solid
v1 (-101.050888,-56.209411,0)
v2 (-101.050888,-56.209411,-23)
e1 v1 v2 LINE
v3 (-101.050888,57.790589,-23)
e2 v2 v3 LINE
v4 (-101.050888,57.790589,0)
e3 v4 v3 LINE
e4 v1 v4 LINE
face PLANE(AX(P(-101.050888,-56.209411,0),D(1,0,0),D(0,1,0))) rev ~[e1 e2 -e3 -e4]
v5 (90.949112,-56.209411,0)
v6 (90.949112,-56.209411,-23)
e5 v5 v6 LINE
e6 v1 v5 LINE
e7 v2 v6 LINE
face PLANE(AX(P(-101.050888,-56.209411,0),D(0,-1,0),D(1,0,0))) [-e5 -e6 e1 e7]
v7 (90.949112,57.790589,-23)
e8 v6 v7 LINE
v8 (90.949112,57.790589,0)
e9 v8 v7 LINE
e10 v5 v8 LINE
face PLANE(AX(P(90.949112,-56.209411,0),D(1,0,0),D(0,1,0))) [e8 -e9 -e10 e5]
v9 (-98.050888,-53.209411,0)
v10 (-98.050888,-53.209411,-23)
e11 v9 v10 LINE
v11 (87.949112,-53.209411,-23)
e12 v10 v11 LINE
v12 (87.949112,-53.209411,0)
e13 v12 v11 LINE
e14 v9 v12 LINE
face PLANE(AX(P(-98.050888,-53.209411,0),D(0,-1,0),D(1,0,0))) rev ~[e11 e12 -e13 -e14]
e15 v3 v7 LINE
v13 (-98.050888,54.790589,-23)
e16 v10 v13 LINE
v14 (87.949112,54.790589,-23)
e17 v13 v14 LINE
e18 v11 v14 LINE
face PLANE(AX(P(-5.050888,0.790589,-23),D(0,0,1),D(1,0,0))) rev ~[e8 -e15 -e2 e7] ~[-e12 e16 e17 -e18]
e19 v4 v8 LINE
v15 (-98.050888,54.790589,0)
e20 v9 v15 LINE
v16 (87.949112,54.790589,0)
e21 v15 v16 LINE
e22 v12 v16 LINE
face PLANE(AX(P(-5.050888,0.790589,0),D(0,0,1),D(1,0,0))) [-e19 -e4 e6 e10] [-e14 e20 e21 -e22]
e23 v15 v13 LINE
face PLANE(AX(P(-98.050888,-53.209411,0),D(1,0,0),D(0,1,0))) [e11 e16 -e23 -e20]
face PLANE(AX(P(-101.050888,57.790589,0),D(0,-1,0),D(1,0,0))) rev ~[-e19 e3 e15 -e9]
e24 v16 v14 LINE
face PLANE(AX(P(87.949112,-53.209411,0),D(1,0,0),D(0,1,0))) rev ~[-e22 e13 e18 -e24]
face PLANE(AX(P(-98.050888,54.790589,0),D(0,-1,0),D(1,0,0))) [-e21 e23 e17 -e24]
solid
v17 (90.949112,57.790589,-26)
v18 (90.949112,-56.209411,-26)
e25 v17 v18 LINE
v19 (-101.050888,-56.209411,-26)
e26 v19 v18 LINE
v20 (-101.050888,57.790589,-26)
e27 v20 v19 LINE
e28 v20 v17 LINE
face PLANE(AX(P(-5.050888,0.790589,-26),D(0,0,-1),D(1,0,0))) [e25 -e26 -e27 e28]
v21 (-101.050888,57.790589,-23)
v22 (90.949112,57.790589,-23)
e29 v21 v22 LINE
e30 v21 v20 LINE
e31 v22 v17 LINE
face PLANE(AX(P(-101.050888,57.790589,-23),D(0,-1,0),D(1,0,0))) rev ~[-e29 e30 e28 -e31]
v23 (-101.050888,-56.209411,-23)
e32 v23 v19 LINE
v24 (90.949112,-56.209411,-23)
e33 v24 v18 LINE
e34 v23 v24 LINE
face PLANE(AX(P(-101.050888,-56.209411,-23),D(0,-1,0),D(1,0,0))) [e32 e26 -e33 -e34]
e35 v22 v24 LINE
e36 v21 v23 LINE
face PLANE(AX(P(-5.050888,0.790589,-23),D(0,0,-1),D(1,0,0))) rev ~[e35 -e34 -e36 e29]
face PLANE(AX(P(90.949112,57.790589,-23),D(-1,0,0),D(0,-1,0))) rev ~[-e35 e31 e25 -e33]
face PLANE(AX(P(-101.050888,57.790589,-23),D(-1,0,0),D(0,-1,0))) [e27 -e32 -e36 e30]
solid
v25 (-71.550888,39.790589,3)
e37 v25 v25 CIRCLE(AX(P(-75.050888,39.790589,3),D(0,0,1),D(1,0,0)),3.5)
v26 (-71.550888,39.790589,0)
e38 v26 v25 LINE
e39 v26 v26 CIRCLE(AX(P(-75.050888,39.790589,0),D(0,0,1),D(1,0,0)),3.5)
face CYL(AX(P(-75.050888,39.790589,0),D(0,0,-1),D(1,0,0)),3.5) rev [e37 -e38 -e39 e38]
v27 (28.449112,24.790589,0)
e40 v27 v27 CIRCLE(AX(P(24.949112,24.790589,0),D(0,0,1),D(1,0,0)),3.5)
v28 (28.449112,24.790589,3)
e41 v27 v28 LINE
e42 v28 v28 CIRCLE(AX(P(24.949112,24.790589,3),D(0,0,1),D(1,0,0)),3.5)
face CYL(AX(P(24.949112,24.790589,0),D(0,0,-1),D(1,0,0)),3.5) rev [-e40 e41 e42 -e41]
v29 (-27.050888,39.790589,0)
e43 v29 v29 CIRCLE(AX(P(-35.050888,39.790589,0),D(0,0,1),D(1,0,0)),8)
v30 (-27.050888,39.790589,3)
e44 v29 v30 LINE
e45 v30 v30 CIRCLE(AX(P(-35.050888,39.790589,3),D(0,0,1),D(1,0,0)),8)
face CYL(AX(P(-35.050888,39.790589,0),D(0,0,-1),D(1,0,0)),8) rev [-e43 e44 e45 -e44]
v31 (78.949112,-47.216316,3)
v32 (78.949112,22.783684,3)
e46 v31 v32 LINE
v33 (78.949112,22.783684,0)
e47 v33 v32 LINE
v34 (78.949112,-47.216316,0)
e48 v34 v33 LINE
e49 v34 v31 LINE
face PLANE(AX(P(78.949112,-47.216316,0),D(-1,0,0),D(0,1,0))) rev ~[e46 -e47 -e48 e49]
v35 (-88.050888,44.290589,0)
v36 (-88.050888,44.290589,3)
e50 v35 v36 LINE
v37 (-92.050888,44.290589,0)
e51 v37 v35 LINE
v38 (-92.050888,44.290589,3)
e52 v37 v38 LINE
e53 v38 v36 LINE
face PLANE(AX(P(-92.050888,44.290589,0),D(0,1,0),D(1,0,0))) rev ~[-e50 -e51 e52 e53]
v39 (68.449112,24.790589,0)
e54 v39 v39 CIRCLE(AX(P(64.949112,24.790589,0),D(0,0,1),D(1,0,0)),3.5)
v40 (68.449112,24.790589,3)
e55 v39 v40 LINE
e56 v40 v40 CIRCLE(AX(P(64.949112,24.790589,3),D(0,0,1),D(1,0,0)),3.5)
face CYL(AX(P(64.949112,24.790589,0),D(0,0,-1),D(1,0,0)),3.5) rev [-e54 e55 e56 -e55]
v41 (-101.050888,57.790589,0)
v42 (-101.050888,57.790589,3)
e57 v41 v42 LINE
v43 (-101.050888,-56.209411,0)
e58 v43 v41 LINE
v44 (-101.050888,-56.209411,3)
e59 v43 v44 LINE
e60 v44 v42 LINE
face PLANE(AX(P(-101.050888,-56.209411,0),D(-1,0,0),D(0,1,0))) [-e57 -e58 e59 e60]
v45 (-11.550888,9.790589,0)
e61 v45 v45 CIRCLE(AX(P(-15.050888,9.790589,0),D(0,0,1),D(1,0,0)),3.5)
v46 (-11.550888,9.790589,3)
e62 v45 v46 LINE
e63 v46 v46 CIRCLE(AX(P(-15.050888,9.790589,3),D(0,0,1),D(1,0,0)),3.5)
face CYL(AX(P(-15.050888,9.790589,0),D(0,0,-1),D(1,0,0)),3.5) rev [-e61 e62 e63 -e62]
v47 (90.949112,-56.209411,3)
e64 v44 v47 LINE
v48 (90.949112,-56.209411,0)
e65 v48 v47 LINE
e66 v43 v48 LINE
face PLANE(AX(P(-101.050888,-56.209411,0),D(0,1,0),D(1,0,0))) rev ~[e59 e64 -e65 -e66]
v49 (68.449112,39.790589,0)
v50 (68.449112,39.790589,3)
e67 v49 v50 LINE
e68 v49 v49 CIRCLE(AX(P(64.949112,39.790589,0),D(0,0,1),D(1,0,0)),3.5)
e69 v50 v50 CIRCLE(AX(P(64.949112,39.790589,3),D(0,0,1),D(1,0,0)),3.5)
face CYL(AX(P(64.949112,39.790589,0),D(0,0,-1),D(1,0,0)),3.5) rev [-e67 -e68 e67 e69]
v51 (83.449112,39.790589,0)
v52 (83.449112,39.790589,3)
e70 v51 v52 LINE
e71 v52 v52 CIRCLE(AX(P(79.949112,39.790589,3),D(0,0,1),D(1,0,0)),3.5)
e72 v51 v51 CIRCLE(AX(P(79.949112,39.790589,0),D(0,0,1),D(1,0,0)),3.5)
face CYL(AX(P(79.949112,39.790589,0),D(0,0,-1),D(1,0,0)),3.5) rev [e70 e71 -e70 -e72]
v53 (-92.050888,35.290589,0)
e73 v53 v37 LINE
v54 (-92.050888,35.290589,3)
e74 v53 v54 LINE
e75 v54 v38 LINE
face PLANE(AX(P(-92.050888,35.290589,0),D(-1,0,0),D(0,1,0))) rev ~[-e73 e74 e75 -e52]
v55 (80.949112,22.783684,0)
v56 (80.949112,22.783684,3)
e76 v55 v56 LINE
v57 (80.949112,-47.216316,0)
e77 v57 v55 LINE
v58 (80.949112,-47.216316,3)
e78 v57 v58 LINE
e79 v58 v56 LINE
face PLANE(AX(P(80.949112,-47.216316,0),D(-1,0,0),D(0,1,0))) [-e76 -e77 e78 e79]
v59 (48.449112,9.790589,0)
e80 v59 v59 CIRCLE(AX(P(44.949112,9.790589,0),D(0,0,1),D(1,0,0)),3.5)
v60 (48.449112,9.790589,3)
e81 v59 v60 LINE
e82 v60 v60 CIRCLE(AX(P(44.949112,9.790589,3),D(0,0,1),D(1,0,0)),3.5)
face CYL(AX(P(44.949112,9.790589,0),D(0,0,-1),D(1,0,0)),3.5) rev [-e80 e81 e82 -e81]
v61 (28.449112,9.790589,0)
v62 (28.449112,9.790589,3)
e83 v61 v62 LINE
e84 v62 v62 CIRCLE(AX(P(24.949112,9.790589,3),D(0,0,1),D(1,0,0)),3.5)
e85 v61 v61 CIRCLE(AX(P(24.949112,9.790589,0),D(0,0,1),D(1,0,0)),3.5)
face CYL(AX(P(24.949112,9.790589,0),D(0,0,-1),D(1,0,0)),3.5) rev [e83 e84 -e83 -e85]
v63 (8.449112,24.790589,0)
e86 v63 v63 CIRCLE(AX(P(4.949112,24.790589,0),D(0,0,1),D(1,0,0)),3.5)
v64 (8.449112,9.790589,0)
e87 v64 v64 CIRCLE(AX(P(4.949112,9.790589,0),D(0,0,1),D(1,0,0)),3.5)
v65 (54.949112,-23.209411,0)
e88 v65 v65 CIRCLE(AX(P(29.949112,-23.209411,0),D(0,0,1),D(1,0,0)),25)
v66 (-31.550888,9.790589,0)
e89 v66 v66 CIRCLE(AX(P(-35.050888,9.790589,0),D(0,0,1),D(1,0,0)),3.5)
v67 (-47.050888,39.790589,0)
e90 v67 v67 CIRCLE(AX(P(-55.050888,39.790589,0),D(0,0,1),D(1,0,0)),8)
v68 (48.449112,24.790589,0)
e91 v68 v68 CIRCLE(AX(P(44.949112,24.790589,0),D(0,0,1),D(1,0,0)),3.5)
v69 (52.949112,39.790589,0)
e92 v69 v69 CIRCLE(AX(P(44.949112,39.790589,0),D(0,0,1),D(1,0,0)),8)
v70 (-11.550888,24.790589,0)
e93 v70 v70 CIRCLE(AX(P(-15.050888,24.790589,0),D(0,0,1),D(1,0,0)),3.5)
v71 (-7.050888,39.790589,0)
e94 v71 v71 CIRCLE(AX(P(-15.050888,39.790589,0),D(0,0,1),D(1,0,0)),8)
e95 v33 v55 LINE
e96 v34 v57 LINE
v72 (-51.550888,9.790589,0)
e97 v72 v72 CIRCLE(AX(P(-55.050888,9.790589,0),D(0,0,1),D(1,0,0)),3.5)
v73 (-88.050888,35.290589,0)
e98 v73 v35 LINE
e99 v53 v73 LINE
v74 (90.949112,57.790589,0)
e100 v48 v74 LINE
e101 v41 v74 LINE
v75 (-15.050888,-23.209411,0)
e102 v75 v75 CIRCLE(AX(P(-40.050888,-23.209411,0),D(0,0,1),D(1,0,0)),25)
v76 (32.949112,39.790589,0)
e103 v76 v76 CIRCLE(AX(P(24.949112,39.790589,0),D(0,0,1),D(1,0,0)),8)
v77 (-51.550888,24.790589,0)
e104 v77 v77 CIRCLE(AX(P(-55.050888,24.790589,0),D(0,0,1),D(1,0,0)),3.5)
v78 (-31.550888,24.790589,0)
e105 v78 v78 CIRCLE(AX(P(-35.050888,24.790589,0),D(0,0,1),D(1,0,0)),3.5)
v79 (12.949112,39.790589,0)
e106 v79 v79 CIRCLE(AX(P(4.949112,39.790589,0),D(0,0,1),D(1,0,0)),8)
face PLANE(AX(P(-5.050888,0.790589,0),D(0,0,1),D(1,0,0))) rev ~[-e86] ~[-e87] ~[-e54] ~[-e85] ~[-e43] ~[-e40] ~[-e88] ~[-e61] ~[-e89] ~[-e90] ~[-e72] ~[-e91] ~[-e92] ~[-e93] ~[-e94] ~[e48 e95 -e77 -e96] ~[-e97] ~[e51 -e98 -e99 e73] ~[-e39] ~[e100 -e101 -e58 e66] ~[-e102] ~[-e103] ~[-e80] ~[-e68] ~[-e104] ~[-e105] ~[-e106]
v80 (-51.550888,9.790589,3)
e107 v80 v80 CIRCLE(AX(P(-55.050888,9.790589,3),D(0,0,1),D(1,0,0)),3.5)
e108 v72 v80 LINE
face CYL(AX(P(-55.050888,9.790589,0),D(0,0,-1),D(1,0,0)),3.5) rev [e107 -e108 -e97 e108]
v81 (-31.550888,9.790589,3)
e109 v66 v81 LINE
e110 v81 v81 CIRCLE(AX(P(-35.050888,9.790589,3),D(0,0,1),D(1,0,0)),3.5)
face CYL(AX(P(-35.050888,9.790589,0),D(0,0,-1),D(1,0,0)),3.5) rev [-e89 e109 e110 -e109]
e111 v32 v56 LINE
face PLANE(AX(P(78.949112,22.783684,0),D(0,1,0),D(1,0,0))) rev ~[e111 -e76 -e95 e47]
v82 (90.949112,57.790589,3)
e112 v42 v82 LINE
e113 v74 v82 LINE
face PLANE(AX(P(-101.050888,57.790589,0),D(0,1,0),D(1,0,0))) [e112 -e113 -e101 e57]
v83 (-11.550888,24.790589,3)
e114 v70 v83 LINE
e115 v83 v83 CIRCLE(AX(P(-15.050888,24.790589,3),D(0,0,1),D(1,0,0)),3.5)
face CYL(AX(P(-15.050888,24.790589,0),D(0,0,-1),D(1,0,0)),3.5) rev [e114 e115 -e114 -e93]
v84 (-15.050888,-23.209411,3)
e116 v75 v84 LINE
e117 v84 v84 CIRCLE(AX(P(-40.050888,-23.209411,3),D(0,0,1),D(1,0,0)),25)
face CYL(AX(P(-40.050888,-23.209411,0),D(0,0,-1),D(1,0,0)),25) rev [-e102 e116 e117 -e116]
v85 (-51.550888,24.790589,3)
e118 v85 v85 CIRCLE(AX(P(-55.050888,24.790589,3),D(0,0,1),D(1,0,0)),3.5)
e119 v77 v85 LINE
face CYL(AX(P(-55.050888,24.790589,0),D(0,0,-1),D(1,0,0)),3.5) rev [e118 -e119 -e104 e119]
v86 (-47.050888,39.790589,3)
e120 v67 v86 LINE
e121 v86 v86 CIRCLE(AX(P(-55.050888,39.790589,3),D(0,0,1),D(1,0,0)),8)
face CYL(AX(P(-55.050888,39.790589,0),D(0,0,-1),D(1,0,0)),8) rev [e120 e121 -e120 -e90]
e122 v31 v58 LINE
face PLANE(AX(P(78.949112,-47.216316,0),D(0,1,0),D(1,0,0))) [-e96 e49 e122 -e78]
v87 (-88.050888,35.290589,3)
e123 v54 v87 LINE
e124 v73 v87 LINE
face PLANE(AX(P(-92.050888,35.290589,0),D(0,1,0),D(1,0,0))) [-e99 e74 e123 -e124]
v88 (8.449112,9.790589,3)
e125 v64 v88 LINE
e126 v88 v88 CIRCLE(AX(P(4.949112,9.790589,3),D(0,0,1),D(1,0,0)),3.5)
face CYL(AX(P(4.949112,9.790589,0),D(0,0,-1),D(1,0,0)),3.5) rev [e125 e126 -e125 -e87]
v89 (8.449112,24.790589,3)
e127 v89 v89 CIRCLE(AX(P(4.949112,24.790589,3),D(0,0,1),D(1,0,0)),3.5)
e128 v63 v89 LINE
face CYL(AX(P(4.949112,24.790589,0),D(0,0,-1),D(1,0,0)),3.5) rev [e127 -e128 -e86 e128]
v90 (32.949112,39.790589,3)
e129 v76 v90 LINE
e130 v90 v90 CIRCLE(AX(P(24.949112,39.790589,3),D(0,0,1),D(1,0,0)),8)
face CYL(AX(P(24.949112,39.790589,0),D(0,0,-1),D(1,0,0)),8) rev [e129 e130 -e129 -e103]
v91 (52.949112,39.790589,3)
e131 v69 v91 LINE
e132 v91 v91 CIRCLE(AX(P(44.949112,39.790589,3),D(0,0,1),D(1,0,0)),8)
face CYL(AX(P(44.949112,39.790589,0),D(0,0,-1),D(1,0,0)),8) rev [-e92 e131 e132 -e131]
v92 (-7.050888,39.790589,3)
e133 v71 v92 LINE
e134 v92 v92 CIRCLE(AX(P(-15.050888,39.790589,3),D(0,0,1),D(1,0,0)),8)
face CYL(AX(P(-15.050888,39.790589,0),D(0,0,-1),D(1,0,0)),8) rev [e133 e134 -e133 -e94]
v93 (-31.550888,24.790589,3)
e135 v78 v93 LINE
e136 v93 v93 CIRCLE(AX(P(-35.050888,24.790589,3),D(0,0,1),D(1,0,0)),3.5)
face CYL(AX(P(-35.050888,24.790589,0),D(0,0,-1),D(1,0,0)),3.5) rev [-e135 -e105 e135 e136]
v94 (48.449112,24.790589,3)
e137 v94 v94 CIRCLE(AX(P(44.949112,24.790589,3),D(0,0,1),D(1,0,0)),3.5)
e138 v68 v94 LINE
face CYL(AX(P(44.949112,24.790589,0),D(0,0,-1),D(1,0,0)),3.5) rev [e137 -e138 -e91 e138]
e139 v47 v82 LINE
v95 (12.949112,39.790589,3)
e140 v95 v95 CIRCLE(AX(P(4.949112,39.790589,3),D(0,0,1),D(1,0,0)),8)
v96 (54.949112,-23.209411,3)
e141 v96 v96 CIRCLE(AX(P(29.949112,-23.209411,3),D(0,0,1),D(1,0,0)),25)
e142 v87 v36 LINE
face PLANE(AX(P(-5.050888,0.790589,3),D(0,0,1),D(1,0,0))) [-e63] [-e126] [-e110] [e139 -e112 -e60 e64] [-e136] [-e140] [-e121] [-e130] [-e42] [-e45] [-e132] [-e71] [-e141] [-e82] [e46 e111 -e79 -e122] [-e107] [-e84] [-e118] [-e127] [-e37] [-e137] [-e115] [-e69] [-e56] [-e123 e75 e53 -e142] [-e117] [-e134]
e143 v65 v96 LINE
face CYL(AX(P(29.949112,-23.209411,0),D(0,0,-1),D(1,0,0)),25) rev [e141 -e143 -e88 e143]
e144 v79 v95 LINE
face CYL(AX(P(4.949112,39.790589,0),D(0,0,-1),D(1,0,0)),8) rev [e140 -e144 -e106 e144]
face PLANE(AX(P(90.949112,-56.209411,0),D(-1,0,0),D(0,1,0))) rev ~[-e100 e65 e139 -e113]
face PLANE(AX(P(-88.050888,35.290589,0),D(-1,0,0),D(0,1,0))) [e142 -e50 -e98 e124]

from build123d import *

# Parameters (mm, degrees)
F1_W     = 192
F1_H     = 114
F1_W_2   = 186
F1_H_2   = 108
F2_DEPTH = 23
F1_R     = 25
F1_W_3   = 10
F1_H_3   = 75
F1_R_2   = 3.5
F1_W_4   = 4
F1_H_4   = 9
F1_R_3   = 8
F1_W_5   = 17
F1_H_5   = 20
F1_W_6   = 2
F1_H_6   = 70
F3_DEPTH = 3
F4_W     = 192
F4_H     = 114
F4_W_2   = 186
F4_H_2   = 108
F5_DEPTH = 3


# Not quite as in the source:
# - a feature names something its author has since deleted; it is built from what else it names


with BuildPart() as f2:
    # F1 (on Top) → F2 (new body)
    with BuildSketch(Plane.XY):
        with Locations((-5.0508876443, 0.7905893784)):
            Rectangle(F1_W, F1_H)
        with Locations((-5.0508876443, 0.7905893784)):
            Rectangle(F1_W_2, F1_H_2, mode=Mode.SUBTRACT)
    extrude(amount=-F2_DEPTH)


with BuildPart() as f3:
    # F1 (on Top) → F3 (new body)
    with BuildSketch(Plane.XY):
        with Locations((-5.0508876443, 0.7905893784)):
            Rectangle(F1_W, F1_H)
        with Locations((-5.0508876443, 0.7905893784)):
            Rectangle(F1_W_2, F1_H_2, mode=Mode.SUBTRACT)
        with Locations((-5.0508876443, 0.7905893784)):
            Rectangle(F1_W_2, F1_H_2)
        with Locations((-40.0508876443, -23.2094106216)):
            Circle(F1_R, mode=Mode.SUBTRACT)
        with Locations((29.9491123557, -23.2094106216)):
            Circle(F1_R, mode=Mode.SUBTRACT)
        with Locations((79.9491123557, -12.2163163405)):
            Rectangle(F1_W_3, F1_H_3, mode=Mode.SUBTRACT)
        with Locations((-55.0508876443, 9.7905893784)):
            Circle(F1_R_2, mode=Mode.SUBTRACT)
        with Locations((-55.0508876443, 24.7905893784)):
            Circle(F1_R_2, mode=Mode.SUBTRACT)
        with Locations((-35.0508876443, 9.7905893784)):
            Circle(F1_R_2, mode=Mode.SUBTRACT)
        with Locations((-15.0508876443, 9.7905893784)):
            Circle(F1_R_2, mode=Mode.SUBTRACT)
        with Locations((-35.0508876443, 24.7905893784)):
            Circle(F1_R_2, mode=Mode.SUBTRACT)
        with Locations((-15.0508876443, 24.7905893784)):
            Circle(F1_R_2, mode=Mode.SUBTRACT)
        with Locations((-90.0508876443, 39.7905893784)):
            Rectangle(F1_W_4, F1_H_4, mode=Mode.SUBTRACT)
        with Locations((-75.0508876443, 39.7905893784)):
            Circle(F1_R_2, mode=Mode.SUBTRACT)
        with Locations((-55.0508876443, 39.7905893784)):
            Circle(F1_R_3, mode=Mode.SUBTRACT)
        with Locations((-35.0508876443, 39.7905893784)):
            Circle(F1_R_3, mode=Mode.SUBTRACT)
        with Locations((-15.0508876443, 39.7905893784)):
            Circle(F1_R_3, mode=Mode.SUBTRACT)
        with Locations((4.9491123557, 9.7905893784)):
            Circle(F1_R_2, mode=Mode.SUBTRACT)
        with Locations((24.9491123557, 9.7905893784)):
            Circle(F1_R_2, mode=Mode.SUBTRACT)
        with Locations((4.9491123557, 24.7905893784)):
            Circle(F1_R_2, mode=Mode.SUBTRACT)
        with Locations((24.9491123557, 24.7905893784)):
            Circle(F1_R_2, mode=Mode.SUBTRACT)
        with Locations((64.9491123557, 3.2005797455)):
            Rectangle(F1_W_5, F1_H_5, mode=Mode.SUBTRACT)
        with Locations((44.9491123557, 9.7905893784)):
            Circle(F1_R_2, mode=Mode.SUBTRACT)
        with Locations((44.9491123557, 24.7905893784)):
            Circle(F1_R_2, mode=Mode.SUBTRACT)
        with Locations((64.9491123557, 24.7905893784)):
            Circle(F1_R_2, mode=Mode.SUBTRACT)
        with Locations((4.9491123557, 39.7905893784)):
            Circle(F1_R_3, mode=Mode.SUBTRACT)
        with Locations((24.9491123557, 39.7905893784)):
            Circle(F1_R_3, mode=Mode.SUBTRACT)
        with Locations((44.9491123557, 39.7905893784)):
            Circle(F1_R_3, mode=Mode.SUBTRACT)
        with Locations((64.9491123557, 39.7905893784)):
            Circle(F1_R_2, mode=Mode.SUBTRACT)
        with Locations((79.9491123557, 39.7905893784)):
            Circle(F1_R_2, mode=Mode.SUBTRACT)
        with Locations((64.9491123557, 3.2005797455)):
            Rectangle(F1_W_5, F1_H_5)
        with Locations((79.9491123557, -12.2163163405)):
            Rectangle(F1_W_3, F1_H_3)
        with Locations((79.9491123557, -12.2163163405)):
            Rectangle(F1_W_6, F1_H_6, mode=Mode.SUBTRACT)
    extrude(amount=F3_DEPTH)


with BuildPart() as f5:
    # F4 (on face) → F5 (new body)
    with BuildSketch(Plane(origin=(0, 0, -23), x_dir=(1, 0, 0), z_dir=(0, 0, -1))):
        with Locations((-5.0508876443, -0.7905893784)):
            Rectangle(F4_W, F4_H)
        with Locations((-5.0508876443, -0.7905893784)):
            Rectangle(F4_W_2, F4_H_2)
    extrude(amount=F5_DEPTH)


solid = Compound([f2.part, f3.part, f5.part])
